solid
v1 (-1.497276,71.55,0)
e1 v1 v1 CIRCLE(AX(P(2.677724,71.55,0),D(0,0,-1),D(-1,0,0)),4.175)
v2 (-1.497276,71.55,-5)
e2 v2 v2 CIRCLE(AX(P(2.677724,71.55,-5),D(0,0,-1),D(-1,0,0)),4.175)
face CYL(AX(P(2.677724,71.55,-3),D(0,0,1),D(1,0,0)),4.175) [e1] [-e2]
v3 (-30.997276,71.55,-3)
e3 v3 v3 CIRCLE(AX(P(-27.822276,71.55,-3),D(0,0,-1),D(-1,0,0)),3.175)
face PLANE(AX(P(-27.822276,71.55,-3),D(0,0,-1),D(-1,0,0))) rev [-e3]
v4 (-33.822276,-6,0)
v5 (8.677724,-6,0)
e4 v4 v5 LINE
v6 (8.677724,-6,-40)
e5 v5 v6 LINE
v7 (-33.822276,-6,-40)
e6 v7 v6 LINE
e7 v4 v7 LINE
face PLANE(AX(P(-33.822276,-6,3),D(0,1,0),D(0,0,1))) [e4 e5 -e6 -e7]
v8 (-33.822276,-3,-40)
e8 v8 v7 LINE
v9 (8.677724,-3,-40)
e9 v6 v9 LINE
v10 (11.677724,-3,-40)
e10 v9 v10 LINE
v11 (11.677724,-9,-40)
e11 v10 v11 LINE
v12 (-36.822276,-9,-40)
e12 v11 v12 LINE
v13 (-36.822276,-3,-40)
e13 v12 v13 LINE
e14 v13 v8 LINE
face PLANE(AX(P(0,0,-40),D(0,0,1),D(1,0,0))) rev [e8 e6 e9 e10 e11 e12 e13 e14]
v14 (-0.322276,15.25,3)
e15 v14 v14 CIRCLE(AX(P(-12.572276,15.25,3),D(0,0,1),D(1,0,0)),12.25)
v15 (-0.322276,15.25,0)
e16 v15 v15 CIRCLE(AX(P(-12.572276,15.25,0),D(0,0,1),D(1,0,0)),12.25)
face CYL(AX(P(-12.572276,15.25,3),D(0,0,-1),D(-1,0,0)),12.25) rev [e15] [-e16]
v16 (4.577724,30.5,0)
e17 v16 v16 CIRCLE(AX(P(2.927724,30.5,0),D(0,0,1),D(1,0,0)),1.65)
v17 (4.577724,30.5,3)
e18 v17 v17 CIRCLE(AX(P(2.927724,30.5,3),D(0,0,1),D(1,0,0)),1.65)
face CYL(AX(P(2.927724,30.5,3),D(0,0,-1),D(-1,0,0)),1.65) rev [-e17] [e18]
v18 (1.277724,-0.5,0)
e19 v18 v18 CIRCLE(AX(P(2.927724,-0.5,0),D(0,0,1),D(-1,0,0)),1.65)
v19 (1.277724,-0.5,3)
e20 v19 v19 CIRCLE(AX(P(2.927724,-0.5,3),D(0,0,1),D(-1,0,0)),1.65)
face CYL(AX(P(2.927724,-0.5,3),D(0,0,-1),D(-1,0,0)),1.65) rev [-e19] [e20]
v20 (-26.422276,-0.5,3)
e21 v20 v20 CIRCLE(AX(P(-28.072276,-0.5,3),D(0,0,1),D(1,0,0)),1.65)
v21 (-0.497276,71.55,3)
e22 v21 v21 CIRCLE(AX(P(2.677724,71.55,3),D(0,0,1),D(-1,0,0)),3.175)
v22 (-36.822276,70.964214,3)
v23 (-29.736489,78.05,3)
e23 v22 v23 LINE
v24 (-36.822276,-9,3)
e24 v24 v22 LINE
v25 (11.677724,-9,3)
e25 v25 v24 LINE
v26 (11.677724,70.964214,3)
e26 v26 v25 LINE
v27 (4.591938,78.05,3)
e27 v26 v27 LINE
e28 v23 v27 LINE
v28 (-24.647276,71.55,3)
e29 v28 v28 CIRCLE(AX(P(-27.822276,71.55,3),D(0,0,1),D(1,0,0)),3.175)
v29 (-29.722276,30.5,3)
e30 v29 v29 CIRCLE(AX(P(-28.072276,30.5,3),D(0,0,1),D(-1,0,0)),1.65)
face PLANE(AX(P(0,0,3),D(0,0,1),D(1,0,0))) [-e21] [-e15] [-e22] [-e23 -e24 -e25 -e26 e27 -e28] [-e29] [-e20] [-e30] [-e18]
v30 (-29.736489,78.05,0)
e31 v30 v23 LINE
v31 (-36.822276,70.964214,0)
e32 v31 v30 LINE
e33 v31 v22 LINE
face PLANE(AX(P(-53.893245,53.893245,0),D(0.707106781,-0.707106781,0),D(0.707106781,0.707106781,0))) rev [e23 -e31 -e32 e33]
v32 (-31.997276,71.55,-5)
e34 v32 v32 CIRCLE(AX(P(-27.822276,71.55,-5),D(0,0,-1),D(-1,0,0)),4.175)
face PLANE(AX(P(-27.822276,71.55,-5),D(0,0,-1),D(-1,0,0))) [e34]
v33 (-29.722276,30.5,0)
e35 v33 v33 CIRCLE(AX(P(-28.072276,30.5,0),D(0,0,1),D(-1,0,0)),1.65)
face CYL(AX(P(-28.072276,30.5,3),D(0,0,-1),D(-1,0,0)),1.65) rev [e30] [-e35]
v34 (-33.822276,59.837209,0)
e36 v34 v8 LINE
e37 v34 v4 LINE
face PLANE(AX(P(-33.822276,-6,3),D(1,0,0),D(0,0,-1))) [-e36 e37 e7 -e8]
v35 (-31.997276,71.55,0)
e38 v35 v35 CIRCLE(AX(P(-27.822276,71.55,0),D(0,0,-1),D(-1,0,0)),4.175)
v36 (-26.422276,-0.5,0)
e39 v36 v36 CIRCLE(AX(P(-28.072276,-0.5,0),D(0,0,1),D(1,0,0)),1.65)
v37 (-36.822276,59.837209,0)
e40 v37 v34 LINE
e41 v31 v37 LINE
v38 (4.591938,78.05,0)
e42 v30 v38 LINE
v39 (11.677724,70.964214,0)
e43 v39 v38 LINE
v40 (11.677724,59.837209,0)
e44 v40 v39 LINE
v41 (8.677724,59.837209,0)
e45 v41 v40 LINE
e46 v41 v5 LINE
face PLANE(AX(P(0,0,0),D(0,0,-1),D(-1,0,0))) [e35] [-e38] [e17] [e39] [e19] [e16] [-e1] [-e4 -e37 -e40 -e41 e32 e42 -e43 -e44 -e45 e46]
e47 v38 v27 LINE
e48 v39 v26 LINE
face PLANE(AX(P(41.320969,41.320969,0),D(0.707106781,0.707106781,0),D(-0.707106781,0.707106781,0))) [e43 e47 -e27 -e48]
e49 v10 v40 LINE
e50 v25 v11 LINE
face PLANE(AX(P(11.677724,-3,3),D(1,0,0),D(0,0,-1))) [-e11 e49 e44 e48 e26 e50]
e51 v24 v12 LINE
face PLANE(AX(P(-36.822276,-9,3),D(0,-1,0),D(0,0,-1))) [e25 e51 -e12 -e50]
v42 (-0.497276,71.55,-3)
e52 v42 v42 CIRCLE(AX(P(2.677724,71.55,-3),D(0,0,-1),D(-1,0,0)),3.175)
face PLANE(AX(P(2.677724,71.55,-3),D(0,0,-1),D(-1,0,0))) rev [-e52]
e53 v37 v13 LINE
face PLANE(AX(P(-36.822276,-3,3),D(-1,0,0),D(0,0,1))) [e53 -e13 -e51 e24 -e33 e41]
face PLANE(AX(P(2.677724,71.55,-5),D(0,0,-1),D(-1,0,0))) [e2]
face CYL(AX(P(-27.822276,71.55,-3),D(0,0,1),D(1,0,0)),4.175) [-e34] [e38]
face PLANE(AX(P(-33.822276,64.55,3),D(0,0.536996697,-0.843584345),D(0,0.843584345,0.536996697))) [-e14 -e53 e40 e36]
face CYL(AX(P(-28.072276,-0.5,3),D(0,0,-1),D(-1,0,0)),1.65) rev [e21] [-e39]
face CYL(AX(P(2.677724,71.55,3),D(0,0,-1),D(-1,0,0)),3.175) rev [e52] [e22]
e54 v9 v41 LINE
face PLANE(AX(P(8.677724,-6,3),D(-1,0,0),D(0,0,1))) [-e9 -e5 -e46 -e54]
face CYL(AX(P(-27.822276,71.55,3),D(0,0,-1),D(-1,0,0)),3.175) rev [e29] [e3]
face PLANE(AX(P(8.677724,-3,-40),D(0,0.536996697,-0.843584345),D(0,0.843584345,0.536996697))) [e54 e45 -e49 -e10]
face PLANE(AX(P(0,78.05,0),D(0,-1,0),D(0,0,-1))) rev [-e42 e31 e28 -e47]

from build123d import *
from build123d.topology import SkipClean

# Parameters (mm, degrees)
SKETCH1_R                = 1.65
SKETCH1_R_2              = 12.25
SKETCH1_R_3              = 3.175
BOSS_EXTRUDE1_DEPTH      = 3
BOSS_EXTRUDE2_START      = 3
SKETCH2_R                = 4.175
SKETCH2_R_2              = 3.175
BOSS_EXTRUDE2_DEPTH      = 3
BOSS_EXTRUDE3_START      = 2
SKETCH3_R                = 4.175
BOSS_EXTRUDE3_DEPTH      = 2
BOSS_EXTRUDE4_DEPTH      = 40
BOSS_EXTRUDE4_DEPTH_BACK = 3
SKETCH5_W                = 3
SKETCH5_H                = 5
BOSS_EXTRUDE5_DEPTH      = 3
BOSS_EXTRUDE7_DEPTH      = 3
BOSS_EXTRUDE9_DEPTH      = 3
SKETCH9_W                = 3
SKETCH9_H                = 75.55
BOSS_EXTRUDE10_DEPTH     = 3
CHAMFER1_SIZE            = 3
BOSS_EXTRUDE12_DEPTH     = 3
BOSS_EXTRUDE13_DEPTH     = 3
BOSS_EXTRUDE14_DEPTH     = 3


with BuildPart() as part:
    # Sketch1 → Boss-Extrude1 (new body)
    with BuildSketch(Plane.XY):
        Polygon((-33.82227566, -6), (-33.82227566, 36.5), (-33.82227566, 72.55), (-28.82227566, 77.55), (3.67772434, 77.55), (8.67772434, 72.55), (8.67772434, 36.5), (8.67772434, -6), align=None)
        with Locations((2.92772434, 30.5)):
            Circle(SKETCH1_R, mode=Mode.SUBTRACT)
        with Locations(Location((2.92772434, -0.5, 0), (0, 0, 180))):
            Circle(SKETCH1_R, mode=Mode.SUBTRACT)
        with Locations((-28.07227566, -0.5)):
            Circle(SKETCH1_R, mode=Mode.SUBTRACT)
        with Locations(Location((-28.07227566, 30.5, 0), (0, 0, 180))):
            Circle(SKETCH1_R, mode=Mode.SUBTRACT)
        with Locations((-12.57227566, 15.25)):
            Circle(SKETCH1_R_2, mode=Mode.SUBTRACT)
        with Locations((-27.82227566, 71.55)):
            Circle(SKETCH1_R_3, mode=Mode.SUBTRACT)
        with Locations(Location((2.67772434, 71.55, 0), (0, 0, 180))):
            Circle(SKETCH1_R_3, mode=Mode.SUBTRACT)
    extrude(amount=BOSS_EXTRUDE1_DEPTH)

    # Sketch2 → Boss-Extrude2 (add)
    # profile 1 of 2: a face of its own
    with SkipClean():  # the faces are left unmerged after this step: merging them gives an invalid solid
        with BuildSketch(Plane(origin=(0, 0, 0), x_dir=(-1, 0, 0), z_dir=(0, 0, -1)).offset(BOSS_EXTRUDE2_START)):
            with Locations((-2.67772434, 71.55)):
                Circle(SKETCH2_R)
            with Locations((-2.67772434, 71.55)):
                Circle(SKETCH2_R_2, mode=Mode.SUBTRACT)
        # profile 2 of 2: a face of its own
        with BuildSketch(Plane(origin=(0, 0, 0), x_dir=(-1, 0, 0), z_dir=(0, 0, -1)).offset(BOSS_EXTRUDE2_START)):
            with Locations((27.82227566, 71.55)):
                Circle(SKETCH2_R)
            with Locations((27.82227566, 71.55)):
                Circle(SKETCH2_R_2, mode=Mode.SUBTRACT)
        extrude(amount=-BOSS_EXTRUDE2_DEPTH)

    # Sketch3 → Boss-Extrude3 (add)
    with SkipClean():  # the faces are left unmerged after this step: merging them gives an invalid solid
        with BuildSketch(Plane(origin=(0, 0, -3), x_dir=(-1, 0, 0), z_dir=(0, 0, -1)).offset(BOSS_EXTRUDE3_START)):
            with Locations((-2.67772434, 71.55)):
                Circle(SKETCH3_R)
            with Locations((27.82227566, 71.55)):
                Circle(SKETCH3_R)
        extrude(amount=-BOSS_EXTRUDE3_DEPTH)

    # Sketch5 → Boss-Extrude5 (add)
    with SkipClean():  # the faces are left unmerged after this step: merging them gives an invalid solid
        with BuildSketch(Plane.XY.offset(3)):
            with Locations((10.17772434, 45.531399611)):
                Rectangle(SKETCH5_W, SKETCH5_H)
            with Locations((-35.32227566, 45.531399611)):
                Rectangle(SKETCH5_W, SKETCH5_H)
        extrude(amount=-BOSS_EXTRUDE5_DEPTH)



with BuildPart() as body_2:
    # Sketch4 → Boss-Extrude4 (new, two sides: drawn at the far end of the back side and taken through both)
    with BuildSketch(Plane(origin=(0, 0, 0), x_dir=(-1, 0, 0), z_dir=(0, 0, -1)).offset(-BOSS_EXTRUDE4_DEPTH_BACK)):
        Polygon((33.82227566, -6), (-8.67772434, -6), (-8.67772434, -3), (-11.67772434, -3), (-11.67772434, -9), (-9.078713654, -9), (33.421286346, -9), (36.82227566, -9), (36.82227566, -3), (33.82227566, -3), align=None)
    extrude(amount=BOSS_EXTRUDE4_DEPTH + BOSS_EXTRUDE4_DEPTH_BACK)


with BuildPart() as part_1:
    with SkipClean():  # the faces are left unmerged after this step: merging them gives an invalid solid
        add(part.part)

        add(body_2.part)  # Boss-Extrude7 merges body 2
        # Sketch6 → Boss-Extrude7 (add)
        with BuildSketch(Plane(origin=(8.67772434, 0, 0), x_dir=(0, 0, -1), z_dir=(1, 0, 0))):
            Polygon((0, 48.031399611), (40, -3), (36.080844313, -3), (0, 43.031399611), align=None)
        extrude(amount=BOSS_EXTRUDE7_DEPTH)

    # Sketch8 → Boss-Extrude9 (add)
    with SkipClean():  # the faces are left unmerged after this step: merging them gives an invalid solid
        with BuildSketch(Plane.ZY.offset(36.82227566)):
            Polygon((0, 48.031399611), (0, 43.031399611), (-36.080844313, -3), (-40, -3), align=None)
        extrude(amount=-BOSS_EXTRUDE9_DEPTH)

    # Sketch9 → Boss-Extrude10 (add)
    with SkipClean():  # the faces are left unmerged after this step: merging them gives an invalid solid
        with BuildSketch(Plane.XY.offset(3)):
            with Locations((-35.32227566, 34.775)):
                Rectangle(SKETCH9_W, SKETCH9_H)
            with Locations((10.17772434, 34.775)):
                Rectangle(SKETCH9_W, SKETCH9_H)
        extrude(amount=-BOSS_EXTRUDE10_DEPTH)

    # Chamfer1
    chamfer1_edges = [part_1.edges().sort_by_distance(p)[0] for p in [
        (11.67772434, 72.55, 1.5),
        (-36.82227566, 72.55, 1.5),
    ]]
    chamfer(chamfer1_edges, length=CHAMFER1_SIZE - 0.0001)  # a hair under: the kernel refuses the full size

    # Sketch10 → Boss-Extrude12 (add)
    with BuildSketch(Plane(origin=(11.67772434, 0, 0), x_dir=(0, 0, -1), z_dir=(1, 0, 0))):
        Polygon((-3, 64.55), (-3, -9), (40, -9), (40, -3), align=None)
    extrude(amount=-BOSS_EXTRUDE12_DEPTH)

    # Sketch11 → Boss-Extrude13 (add)
    with BuildSketch(Plane.ZY.offset(36.82227566)):
        Polygon((3, -9), (3, 64.55), (-40, -3), (-40, -9), align=None)
    extrude(amount=-BOSS_EXTRUDE13_DEPTH)

    # Sketch12 → Boss-Extrude14 (add)
    with BuildSketch(Plane.XY.offset(3)):
        Polygon((-36.82227566, 70.964213562), (-36.82227566, 69.55), (-33.82227566, 72.55), (-28.82227566, 77.55), (-12.57227566, 77.55), (-12.57227566, 78.05), (-29.736489222, 78.05), align=None)
        Polygon((4.591937902, 78.05), (-12.57227566, 78.05), (-12.57227566, 77.55), (3.67772434, 77.55), (8.67772434, 72.55), (11.67772434, 69.55), (11.67772434, 70.964213562), align=None)
    extrude(amount=-BOSS_EXTRUDE14_DEPTH)


solid = part_1.part
